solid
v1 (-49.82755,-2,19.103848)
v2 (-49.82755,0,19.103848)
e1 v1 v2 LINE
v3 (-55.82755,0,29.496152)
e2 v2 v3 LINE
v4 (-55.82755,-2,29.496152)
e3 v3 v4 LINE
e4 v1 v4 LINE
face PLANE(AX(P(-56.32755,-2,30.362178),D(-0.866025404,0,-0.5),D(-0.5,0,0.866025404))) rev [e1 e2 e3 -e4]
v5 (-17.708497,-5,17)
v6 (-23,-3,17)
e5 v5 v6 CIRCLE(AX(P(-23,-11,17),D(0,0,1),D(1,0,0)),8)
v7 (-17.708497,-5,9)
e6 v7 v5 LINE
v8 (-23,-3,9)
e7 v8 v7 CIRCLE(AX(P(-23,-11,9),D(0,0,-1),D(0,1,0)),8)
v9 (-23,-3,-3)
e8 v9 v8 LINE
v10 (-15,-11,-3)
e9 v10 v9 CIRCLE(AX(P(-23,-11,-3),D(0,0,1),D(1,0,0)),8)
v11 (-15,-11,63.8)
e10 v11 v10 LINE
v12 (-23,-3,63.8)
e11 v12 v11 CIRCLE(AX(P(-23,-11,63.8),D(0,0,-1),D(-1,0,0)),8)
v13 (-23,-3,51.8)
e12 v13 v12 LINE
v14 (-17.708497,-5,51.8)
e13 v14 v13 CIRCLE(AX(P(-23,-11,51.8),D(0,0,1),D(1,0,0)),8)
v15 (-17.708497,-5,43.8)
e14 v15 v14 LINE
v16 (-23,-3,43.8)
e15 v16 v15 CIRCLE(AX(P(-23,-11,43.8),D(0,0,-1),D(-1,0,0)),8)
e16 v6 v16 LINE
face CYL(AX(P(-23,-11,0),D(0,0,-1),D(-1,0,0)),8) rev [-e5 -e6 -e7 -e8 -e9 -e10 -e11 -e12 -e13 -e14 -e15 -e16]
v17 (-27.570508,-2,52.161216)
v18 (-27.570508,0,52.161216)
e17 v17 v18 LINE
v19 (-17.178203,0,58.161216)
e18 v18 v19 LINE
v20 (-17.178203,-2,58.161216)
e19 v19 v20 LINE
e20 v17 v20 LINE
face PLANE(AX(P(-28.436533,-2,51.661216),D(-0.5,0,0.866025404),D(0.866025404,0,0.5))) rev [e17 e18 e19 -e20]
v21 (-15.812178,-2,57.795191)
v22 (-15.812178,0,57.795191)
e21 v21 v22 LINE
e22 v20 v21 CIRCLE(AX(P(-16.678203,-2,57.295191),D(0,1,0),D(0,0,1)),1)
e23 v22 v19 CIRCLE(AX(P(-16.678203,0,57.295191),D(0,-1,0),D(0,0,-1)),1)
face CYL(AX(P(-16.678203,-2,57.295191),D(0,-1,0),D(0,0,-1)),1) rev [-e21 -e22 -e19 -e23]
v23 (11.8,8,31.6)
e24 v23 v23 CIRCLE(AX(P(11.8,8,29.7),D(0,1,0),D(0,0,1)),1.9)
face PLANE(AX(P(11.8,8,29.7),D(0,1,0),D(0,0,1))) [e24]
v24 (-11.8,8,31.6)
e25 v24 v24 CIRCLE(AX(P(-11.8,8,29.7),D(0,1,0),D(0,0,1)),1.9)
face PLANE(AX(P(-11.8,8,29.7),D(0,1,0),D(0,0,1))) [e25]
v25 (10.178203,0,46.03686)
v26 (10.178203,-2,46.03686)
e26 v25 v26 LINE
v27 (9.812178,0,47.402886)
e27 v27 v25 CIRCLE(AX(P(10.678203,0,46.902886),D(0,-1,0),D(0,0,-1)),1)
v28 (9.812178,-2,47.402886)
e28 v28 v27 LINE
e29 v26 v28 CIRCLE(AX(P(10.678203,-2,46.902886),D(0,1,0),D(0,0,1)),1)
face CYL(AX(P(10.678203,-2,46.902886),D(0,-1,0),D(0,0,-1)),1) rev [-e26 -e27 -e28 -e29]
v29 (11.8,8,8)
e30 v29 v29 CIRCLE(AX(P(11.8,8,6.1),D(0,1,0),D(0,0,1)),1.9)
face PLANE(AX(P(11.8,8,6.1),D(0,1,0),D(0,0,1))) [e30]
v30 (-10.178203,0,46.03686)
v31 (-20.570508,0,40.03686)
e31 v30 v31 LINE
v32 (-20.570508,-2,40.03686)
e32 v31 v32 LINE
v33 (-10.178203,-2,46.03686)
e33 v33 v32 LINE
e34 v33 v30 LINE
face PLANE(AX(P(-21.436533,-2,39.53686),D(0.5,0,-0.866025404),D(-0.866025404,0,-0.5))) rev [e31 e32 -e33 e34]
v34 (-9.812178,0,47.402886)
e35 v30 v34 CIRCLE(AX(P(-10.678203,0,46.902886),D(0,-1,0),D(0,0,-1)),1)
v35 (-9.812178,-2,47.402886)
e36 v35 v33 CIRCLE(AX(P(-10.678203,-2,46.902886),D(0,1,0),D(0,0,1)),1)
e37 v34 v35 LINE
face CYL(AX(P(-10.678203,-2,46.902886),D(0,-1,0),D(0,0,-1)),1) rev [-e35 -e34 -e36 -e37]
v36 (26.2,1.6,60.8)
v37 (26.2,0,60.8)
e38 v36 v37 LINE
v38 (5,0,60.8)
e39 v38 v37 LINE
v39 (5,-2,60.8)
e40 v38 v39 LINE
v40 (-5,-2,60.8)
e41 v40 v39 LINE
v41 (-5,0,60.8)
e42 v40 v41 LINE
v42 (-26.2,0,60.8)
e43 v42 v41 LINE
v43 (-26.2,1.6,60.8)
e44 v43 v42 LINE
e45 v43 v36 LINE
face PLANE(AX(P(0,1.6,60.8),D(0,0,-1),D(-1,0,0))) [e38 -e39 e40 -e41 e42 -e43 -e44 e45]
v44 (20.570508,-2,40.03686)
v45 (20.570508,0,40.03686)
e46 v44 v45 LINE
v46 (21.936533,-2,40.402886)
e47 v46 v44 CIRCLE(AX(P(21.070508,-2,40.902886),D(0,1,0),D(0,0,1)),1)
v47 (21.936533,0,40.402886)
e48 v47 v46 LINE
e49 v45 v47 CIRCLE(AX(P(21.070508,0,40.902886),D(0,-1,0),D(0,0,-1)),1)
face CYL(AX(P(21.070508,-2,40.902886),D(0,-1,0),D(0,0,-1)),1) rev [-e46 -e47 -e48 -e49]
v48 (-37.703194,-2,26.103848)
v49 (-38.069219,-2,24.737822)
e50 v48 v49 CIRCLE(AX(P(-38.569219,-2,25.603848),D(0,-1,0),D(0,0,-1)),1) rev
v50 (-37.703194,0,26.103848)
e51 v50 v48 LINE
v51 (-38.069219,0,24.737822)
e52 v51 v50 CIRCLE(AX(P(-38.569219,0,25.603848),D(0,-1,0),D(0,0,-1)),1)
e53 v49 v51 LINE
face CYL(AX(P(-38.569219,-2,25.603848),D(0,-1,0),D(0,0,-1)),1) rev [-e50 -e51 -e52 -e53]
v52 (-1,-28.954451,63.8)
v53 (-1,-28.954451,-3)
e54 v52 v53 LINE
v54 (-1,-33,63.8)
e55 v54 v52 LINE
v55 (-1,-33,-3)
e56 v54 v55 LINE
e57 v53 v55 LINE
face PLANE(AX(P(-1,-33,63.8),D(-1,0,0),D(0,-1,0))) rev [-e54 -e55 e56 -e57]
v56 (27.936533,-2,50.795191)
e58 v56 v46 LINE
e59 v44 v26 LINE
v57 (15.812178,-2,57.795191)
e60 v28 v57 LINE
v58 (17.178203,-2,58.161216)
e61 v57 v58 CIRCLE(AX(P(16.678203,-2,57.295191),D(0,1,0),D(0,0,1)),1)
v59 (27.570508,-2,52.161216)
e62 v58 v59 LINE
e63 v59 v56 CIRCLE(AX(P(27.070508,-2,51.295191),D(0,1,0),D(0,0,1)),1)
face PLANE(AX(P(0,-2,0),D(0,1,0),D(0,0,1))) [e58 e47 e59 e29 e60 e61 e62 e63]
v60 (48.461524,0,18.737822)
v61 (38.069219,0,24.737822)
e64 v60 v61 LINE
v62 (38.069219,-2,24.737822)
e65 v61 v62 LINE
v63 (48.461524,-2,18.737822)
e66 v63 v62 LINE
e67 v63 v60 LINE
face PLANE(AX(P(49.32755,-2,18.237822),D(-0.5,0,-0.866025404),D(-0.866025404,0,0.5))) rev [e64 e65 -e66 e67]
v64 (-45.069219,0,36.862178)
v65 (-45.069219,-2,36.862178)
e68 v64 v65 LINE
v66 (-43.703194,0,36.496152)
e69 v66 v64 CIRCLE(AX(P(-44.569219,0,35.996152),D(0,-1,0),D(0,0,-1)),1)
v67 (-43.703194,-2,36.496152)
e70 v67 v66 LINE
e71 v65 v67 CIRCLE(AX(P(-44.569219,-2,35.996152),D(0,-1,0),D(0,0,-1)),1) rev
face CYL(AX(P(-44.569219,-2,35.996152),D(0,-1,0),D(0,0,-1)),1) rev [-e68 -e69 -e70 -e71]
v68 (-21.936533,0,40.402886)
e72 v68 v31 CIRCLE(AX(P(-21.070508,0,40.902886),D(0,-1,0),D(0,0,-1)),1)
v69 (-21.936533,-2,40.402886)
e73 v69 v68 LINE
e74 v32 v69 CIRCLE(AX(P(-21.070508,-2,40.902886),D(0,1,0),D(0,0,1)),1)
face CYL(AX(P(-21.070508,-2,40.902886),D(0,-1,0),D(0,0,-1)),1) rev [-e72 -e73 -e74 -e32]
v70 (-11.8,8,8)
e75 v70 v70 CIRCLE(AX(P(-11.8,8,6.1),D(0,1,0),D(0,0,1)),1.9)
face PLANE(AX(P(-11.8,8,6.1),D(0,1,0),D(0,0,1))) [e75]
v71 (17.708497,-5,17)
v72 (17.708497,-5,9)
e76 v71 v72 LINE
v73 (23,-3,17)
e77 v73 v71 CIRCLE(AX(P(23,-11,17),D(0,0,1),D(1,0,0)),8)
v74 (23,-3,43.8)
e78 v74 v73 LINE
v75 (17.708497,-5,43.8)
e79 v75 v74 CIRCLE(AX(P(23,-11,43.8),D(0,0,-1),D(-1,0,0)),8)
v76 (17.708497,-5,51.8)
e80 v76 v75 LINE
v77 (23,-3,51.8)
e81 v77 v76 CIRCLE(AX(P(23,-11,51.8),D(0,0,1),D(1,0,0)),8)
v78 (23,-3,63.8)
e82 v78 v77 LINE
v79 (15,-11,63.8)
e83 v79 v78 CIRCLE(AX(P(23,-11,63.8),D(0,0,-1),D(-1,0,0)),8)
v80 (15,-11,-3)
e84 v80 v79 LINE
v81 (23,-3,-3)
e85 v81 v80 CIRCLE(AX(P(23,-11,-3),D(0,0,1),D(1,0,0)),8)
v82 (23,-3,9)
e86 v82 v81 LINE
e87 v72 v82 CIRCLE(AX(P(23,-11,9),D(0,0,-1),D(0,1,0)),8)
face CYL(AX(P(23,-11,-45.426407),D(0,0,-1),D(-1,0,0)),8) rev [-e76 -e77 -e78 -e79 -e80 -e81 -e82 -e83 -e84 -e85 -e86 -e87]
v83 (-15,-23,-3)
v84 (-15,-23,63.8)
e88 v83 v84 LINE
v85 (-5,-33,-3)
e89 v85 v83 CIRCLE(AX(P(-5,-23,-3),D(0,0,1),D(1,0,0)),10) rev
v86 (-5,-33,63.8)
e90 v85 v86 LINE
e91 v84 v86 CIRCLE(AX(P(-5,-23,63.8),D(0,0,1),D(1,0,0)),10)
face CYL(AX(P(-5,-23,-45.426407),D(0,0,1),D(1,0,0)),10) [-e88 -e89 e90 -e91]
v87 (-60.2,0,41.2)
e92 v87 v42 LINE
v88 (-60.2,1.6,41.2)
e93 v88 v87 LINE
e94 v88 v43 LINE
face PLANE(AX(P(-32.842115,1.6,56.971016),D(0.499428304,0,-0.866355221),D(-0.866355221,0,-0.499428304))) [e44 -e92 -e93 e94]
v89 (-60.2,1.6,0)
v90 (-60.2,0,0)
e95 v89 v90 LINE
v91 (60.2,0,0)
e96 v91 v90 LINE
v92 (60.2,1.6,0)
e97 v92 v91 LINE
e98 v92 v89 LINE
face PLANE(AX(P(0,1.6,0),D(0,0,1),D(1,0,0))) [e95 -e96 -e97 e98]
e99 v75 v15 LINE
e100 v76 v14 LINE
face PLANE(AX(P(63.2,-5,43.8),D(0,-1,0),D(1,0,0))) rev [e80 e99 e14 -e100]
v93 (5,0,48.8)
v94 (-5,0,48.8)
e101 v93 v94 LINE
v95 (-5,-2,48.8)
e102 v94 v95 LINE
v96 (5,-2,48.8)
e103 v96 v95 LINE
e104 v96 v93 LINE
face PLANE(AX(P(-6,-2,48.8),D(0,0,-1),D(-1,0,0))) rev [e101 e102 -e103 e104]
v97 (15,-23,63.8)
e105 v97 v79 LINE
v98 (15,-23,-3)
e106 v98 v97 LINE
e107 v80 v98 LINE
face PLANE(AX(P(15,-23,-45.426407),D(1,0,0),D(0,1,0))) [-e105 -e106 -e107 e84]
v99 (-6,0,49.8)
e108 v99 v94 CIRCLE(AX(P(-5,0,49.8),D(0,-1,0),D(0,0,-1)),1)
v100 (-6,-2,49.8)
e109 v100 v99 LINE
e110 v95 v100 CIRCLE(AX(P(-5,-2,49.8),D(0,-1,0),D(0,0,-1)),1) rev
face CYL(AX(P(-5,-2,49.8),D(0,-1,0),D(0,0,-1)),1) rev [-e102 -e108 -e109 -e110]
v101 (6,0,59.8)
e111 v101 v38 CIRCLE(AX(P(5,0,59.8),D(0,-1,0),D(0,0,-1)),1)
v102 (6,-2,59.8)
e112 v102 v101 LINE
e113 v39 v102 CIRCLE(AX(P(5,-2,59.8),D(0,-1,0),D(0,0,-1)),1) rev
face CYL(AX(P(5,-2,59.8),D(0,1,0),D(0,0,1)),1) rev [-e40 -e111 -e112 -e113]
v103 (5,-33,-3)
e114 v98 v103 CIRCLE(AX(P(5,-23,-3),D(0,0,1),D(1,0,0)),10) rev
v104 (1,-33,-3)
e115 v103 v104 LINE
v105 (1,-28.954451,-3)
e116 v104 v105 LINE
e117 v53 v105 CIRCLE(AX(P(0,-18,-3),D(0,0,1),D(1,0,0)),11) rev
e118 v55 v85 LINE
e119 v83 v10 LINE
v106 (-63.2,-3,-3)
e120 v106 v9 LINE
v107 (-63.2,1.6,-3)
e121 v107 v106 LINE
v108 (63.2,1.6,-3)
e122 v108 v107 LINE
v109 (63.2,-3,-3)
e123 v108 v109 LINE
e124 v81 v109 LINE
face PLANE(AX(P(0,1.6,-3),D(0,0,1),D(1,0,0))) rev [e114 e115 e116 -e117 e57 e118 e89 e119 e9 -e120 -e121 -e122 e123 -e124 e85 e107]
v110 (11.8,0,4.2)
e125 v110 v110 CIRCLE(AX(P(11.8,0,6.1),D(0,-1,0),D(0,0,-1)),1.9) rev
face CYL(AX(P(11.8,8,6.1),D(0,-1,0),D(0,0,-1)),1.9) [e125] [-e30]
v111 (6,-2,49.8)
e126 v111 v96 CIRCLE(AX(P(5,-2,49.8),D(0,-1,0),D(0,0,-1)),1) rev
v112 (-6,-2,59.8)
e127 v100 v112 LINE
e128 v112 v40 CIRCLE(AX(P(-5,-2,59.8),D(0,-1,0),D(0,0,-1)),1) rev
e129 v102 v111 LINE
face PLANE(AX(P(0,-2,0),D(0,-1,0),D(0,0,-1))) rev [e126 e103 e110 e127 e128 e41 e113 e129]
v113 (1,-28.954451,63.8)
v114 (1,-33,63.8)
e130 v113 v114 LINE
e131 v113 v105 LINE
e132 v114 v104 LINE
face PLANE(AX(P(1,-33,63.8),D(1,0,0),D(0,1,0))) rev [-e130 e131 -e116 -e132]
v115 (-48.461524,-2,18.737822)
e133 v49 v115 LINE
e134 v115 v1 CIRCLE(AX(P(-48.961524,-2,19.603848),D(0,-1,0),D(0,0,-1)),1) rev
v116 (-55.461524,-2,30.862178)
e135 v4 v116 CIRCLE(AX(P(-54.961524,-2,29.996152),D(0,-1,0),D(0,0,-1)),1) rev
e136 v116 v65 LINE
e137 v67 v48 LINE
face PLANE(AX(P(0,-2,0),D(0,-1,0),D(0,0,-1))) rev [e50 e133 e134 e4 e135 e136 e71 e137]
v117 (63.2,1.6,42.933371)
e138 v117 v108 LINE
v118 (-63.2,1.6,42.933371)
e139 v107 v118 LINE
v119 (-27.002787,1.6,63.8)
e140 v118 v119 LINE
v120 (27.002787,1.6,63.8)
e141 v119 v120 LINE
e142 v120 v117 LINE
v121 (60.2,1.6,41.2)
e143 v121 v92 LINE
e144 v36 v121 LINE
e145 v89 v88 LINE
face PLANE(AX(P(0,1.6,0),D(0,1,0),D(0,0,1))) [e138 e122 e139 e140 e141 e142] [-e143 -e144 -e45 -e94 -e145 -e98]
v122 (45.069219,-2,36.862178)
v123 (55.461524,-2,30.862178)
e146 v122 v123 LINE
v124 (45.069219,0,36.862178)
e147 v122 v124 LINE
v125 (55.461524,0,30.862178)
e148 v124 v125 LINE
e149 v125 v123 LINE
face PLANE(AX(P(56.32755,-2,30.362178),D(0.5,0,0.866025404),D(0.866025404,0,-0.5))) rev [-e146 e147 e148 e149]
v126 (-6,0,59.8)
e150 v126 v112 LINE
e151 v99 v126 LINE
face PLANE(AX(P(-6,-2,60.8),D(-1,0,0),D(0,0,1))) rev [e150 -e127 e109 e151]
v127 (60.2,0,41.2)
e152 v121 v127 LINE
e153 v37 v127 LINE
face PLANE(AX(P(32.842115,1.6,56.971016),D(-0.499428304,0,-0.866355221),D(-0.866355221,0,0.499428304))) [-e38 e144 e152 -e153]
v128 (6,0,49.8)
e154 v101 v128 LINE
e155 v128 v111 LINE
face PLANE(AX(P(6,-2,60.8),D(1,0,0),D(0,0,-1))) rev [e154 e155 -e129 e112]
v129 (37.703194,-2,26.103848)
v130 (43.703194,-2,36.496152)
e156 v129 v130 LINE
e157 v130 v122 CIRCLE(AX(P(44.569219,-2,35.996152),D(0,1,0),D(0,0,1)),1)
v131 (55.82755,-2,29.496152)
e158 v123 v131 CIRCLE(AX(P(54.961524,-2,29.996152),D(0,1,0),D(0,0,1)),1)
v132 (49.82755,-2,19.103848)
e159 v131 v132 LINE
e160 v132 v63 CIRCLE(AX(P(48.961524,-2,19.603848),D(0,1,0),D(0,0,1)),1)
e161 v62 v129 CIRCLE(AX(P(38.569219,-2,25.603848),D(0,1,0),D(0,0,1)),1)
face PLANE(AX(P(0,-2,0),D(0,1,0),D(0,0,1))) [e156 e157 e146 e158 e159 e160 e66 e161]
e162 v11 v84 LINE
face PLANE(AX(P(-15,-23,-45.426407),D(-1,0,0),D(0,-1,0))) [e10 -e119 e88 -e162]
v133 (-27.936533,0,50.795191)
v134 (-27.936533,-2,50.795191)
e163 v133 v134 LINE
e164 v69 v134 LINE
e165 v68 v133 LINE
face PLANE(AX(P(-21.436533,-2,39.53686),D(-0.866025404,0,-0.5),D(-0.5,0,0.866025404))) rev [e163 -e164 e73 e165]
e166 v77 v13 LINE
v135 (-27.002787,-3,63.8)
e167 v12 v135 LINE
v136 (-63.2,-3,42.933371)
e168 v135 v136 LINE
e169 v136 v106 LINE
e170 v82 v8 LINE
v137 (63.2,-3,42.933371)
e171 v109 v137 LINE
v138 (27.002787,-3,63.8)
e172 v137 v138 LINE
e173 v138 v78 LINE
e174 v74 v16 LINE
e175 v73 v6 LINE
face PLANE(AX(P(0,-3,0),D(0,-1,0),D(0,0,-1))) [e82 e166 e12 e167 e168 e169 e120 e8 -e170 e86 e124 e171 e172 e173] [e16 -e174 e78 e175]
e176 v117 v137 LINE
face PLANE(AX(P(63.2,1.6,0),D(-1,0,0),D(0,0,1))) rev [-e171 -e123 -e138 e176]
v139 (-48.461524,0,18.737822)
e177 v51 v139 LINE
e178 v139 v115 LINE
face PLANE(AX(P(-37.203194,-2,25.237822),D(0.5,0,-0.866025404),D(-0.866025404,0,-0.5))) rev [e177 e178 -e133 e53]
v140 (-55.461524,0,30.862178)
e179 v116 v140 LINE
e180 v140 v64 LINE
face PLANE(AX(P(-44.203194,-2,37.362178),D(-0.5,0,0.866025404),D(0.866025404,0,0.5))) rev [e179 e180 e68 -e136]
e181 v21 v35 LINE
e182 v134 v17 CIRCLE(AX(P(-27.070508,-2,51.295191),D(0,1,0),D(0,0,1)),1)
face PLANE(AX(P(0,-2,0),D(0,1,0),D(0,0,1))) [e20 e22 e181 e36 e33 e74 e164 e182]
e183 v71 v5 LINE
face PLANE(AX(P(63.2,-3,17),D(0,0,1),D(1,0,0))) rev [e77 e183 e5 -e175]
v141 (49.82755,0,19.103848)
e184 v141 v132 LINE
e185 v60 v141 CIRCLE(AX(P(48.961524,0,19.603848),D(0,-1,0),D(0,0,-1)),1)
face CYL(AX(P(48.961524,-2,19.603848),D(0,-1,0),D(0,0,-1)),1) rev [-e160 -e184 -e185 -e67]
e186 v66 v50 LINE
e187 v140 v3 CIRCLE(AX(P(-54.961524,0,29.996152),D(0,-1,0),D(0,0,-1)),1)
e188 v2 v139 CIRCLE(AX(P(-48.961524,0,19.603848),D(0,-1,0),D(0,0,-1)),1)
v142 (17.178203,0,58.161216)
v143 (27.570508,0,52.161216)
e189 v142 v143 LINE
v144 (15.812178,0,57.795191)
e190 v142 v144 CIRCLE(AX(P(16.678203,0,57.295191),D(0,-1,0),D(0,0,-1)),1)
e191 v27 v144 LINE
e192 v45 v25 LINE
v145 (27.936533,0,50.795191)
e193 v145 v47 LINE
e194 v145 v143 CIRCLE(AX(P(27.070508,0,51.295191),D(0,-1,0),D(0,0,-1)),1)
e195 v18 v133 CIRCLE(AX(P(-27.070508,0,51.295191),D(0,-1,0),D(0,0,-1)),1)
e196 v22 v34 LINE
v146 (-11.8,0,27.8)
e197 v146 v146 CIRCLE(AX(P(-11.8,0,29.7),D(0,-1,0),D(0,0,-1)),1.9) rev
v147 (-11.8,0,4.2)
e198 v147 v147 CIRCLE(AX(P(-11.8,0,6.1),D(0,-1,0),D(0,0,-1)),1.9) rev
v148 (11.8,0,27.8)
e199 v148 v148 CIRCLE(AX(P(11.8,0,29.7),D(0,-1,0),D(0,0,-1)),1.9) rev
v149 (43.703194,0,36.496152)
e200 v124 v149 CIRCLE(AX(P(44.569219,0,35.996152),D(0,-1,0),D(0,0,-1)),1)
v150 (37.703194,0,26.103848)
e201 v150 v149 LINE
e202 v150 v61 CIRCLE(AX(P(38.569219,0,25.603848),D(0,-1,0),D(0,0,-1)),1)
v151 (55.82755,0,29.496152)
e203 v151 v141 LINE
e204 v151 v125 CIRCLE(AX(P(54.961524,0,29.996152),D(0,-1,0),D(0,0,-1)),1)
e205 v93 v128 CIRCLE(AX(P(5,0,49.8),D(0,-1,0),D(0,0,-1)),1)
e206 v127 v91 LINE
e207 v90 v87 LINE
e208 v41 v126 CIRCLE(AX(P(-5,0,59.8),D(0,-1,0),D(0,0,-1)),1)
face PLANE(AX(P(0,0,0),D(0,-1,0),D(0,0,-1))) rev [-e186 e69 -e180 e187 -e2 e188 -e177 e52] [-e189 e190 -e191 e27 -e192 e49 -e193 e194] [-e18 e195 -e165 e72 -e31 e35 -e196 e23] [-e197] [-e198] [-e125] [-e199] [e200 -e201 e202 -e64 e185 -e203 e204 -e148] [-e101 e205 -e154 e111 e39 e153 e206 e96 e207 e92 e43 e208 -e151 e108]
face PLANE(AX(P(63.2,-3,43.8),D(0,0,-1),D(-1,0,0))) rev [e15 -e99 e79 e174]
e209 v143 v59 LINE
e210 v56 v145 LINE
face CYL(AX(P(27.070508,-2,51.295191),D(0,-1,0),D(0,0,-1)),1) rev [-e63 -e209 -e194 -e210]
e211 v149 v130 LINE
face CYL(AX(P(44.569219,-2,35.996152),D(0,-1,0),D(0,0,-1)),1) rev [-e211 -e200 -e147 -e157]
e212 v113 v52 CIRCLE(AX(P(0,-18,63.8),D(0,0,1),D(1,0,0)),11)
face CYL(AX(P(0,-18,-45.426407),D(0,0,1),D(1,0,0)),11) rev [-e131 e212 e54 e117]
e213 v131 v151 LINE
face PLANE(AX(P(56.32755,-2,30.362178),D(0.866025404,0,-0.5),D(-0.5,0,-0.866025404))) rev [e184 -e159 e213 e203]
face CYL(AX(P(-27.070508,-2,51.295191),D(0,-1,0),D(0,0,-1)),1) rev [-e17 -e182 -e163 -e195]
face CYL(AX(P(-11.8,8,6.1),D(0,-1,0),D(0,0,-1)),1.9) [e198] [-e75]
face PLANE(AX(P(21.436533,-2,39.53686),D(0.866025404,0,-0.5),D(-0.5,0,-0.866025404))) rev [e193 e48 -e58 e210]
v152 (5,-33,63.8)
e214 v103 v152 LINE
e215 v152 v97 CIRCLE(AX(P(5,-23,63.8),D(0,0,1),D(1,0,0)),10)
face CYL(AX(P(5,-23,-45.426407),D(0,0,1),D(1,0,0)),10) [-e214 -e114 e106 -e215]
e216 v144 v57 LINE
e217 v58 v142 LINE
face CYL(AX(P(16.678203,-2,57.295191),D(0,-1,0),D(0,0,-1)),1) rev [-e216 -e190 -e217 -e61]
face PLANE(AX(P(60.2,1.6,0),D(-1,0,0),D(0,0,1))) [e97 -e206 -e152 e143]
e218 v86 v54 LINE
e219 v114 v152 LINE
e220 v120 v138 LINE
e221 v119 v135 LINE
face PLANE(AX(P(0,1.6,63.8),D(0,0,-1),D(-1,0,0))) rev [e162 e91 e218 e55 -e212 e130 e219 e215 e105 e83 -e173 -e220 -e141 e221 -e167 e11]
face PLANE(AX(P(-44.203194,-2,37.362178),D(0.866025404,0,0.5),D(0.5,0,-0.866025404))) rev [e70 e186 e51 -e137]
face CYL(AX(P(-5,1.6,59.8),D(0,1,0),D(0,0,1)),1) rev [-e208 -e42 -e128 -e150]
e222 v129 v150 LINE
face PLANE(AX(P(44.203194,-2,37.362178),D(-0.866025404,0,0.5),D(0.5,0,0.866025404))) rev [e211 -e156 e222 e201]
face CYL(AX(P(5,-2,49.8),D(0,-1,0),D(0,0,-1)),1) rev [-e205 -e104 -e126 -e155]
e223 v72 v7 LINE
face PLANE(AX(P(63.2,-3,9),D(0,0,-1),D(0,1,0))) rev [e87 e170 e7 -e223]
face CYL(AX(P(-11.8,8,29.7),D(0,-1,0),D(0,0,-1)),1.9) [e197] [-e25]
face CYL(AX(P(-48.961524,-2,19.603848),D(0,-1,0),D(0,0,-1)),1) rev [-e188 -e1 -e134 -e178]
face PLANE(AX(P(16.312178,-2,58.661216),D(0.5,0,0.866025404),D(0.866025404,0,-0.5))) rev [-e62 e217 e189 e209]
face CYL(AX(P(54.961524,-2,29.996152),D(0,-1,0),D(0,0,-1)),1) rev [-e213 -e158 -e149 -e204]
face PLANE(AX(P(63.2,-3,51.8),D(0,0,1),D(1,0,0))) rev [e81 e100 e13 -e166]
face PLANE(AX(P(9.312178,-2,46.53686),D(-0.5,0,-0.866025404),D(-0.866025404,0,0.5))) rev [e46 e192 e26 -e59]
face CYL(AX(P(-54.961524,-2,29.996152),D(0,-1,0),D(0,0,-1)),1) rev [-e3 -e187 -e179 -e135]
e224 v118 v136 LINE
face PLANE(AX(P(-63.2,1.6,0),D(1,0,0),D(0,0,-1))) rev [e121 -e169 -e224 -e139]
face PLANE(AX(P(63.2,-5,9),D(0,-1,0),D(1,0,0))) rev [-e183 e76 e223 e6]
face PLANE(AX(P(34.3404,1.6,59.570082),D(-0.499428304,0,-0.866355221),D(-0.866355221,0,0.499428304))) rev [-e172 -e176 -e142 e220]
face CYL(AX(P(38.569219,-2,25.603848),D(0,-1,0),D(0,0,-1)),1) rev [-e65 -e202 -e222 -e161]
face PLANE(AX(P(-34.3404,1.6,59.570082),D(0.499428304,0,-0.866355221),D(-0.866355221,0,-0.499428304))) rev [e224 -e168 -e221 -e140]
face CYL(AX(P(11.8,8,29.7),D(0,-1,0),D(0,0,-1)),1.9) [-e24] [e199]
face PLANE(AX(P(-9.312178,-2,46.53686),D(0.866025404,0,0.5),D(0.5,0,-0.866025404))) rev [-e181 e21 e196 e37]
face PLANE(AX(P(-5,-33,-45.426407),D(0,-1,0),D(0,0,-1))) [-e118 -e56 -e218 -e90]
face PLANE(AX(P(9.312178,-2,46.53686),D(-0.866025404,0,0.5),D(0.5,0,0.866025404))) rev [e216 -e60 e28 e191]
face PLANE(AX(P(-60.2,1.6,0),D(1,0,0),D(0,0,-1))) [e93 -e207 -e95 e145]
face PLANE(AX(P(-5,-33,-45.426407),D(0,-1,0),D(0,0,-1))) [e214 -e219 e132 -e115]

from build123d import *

# Parameters (mm, degrees)
EXTRUDE_1_DEPTH          = 1.6
EXTRUDE_2_DEPTH          = 3
SKETCH_3_W               = 12
SKETCH_3_H               = 12
CUT_EXTRUDE_1_DEPTH      = 2
FILLET_1_R               = 1
SKETCH_4_R               = 1.9
EXTRUDE_3_DEPTH          = 8
SKETCH_12_R              = 11
EXTRUDE_9_DEPTH          = 66.8
CUT_EXTRUDE_2_DEPTH      = 98.70097236
CUT_EXTRUDE_2_DEPTH_BACK = 98.70097236
SKETCH_13_W              = 2
SKETCH_13_H              = 4.04554885
CUT_EXTRUDE_5_DEPTH      = 107.182296076
CUT_EXTRUDE_5_DEPTH_BACK = 107.182296076
SKETCH_16_W              = 8
SKETCH_16_H              = 2
FILLET_2_R               = 8


with BuildPart() as part:
    # Эскиз1 → Бобышка-Вытянуть1 (new body)
    with BuildSketch(Plane(origin=(0, 0, 0), x_dir=(1, 0, 0), z_dir=(0, 1, 0))):
        Polygon((27.002786573, -63.8), (63.2, -42.933371083), (63.2, 3), (-63.2, 3), (-63.2, -42.933371083), (-27.002786573, -63.8), align=None)
        Polygon((60.2, -41.2), (60.2, 0), (-60.2, 0), (-60.2, -41.2), (-26.2, -60.8), (26.2, -60.8), align=None, mode=Mode.SUBTRACT)
    extrude(amount=EXTRUDE_1_DEPTH)

    # Эскиз2 → Бобышка-Вытянуть2 (add)
    with BuildSketch(Plane.XZ):
        Polygon((63.2, 42.933371083), (27.002786573, 63.8), (-27.002786573, 63.8), (-63.2, 42.933371083), (-63.2, -3), (63.2, -3), align=None)
    extrude(amount=EXTRUDE_2_DEPTH)

    # Эскиз3 → Вырез-Вытянуть1 (cut)
    with BuildSketch(Plane(origin=(0, 0, 0), x_dir=(1, 0, 0), z_dir=(0, 1, 0))):
        with Locations((0, -54.8)):
            Rectangle(SKETCH_3_W, SKETCH_3_H)
        Polygon((-21.436533479, -39.536860279), (-9.312177826, -46.536860279), (-16.312177826, -58.661215932), (-28.436533479, -51.661215932), align=None)
        Polygon((9.312177826, -46.536860279), (21.436533479, -39.536860279), (28.436533479, -51.661215932), (16.312177826, -58.661215932), align=None)
        Polygon((56.327549631, -30.362177826), (44.203193978, -37.362177826), (37.203193978, -25.237822174), (49.327549631, -18.237822174), align=None)
        Polygon((-44.203193978, -37.362177826), (-37.203193978, -25.237822174), (-49.327549631, -18.237822174), (-56.327549631, -30.362177826), align=None)
    extrude(amount=-CUT_EXTRUDE_1_DEPTH, mode=Mode.SUBTRACT)

    # Скругление1
    fillet_1_edges = [part.edges().sort_by_distance(p)[0] for p in [
        (-44.203193978, -1, 37.362177826),
        (-56.327549631, -1, 30.362177826),
        (-49.327549631, -1, 18.237822174),
        (-37.203193978, -1, 25.237822174),
        (49.327549631, -1, 18.237822174),
        (56.327549631, -1, 30.362177826),
        (44.203193978, -1, 37.362177826),
        (37.203193978, -1, 25.237822174),
        (-28.436533479, -1, 51.661215932),
        (-21.436533479, -1, 39.536860279),
        (-9.312177826, -1, 46.536860279),
        (-16.312177826, -1, 58.661215932),
        (16.312177826, -1, 58.661215932),
        (9.312177826, -1, 46.536860279),
        (21.436533479, -1, 39.536860279),
        (28.436533479, -1, 51.661215932),
        (-6, -1, 60.8),
        (-6, -1, 48.8),
        (6, -1, 48.8),
        (6, -1, 60.8),
    ]]
    fillet(fillet_1_edges, radius=FILLET_1_R)

    # Эскиз4 → Бобышка-Вытянуть3 (add)
    with BuildSketch(Plane(origin=(0, 0, 0), x_dir=(1, 0, 0), z_dir=(0, 1, 0))):
        with Locations(Location((-11.8, -6.1, 0), (0, 0, 90))):
            Circle(SKETCH_4_R)
        with Locations(Location((-11.8, -29.7, 0), (0, 0, 90))):
            Circle(SKETCH_4_R)
        with Locations(Location((11.8, -29.7, 0), (0, 0, 90))):
            Circle(SKETCH_4_R)
        with Locations(Location((11.8, -6.1, 0), (0, 0, 90))):
            Circle(SKETCH_4_R)
    extrude(amount=EXTRUDE_3_DEPTH)

    # Эскиз12 → Бобышка-Вытянуть9 (add)
    with BuildSketch(Plane.XY.offset(63.8)):
        with BuildLine():
            Line((-5, -33), (5, -33))
            ThreePointArc((5, -33), (12.071067812, -30.071067812), (15, -23))
            Line((15, -23), (15, -3))
            Line((15, -3), (-15, -3))
            Line((-15, -3), (-15, -23))
            ThreePointArc((-15, -23), (-12.071067812, -30.071067812), (-5, -33))
        make_face()
        with Locations((0, -18)):
            Circle(SKETCH_12_R, mode=Mode.SUBTRACT)
    extrude(amount=-EXTRUDE_9_DEPTH)

    # Эскиз13 → Вырез-Вытянуть2 (cut, two sides: drawn at the far end of the back side and taken through both)
    with BuildSketch(Plane(origin=(0, 0, -3), x_dir=(-1, 0, 0), z_dir=(0, 0, -1)).offset(-CUT_EXTRUDE_2_DEPTH_BACK)):
        with Locations((0, -30.977225575)):
            Rectangle(SKETCH_13_W, SKETCH_13_H)
    extrude(amount=CUT_EXTRUDE_2_DEPTH + CUT_EXTRUDE_2_DEPTH_BACK, mode=Mode.SUBTRACT)

    # Эскиз16 → Вырез-Вытянуть5 (cut, two sides: drawn at the far end of the back side and taken through both)
    with BuildSketch(Plane.ZY.offset(15).offset(-CUT_EXTRUDE_5_DEPTH_BACK)):
        with Locations((13, -4)):
            Rectangle(SKETCH_16_W, SKETCH_16_H)
        with Locations((47.8, -4)):
            Rectangle(SKETCH_16_W, SKETCH_16_H)
    extrude(amount=CUT_EXTRUDE_5_DEPTH + CUT_EXTRUDE_5_DEPTH_BACK, mode=Mode.SUBTRACT)

    # Скругление2
    # the kernel refuses this fillet: 8 mm, written as the material it adds along each edge
    with BuildSketch(Plane(origin=(15, -3, 29), x_dir=(0, -1, 0), z_dir=(0, 0, -1))) as fillet_2_piece_1_section:
        with BuildLine():
            CenterArc((FILLET_2_R, -FILLET_2_R), FILLET_2_R, 90, 90)
            Line((0, -FILLET_2_R), (0, 0))
            Line((0, 0), (FILLET_2_R, 0))
        make_face()
    fillet_2_piece_1 = extrude(amount=32, mode=Mode.PRIVATE)
    fillet_2_piece_1 = split(fillet_2_piece_1, bisect_by=Plane(origin=(15.781963001, -5, 23), z_dir=(0, -1, 0)), keep=Keep.TOP, mode=Mode.PRIVATE)
    add(fillet_2_piece_1)
    with BuildSketch(Plane(origin=(15, -3, 29), x_dir=(0, -1, 0), z_dir=(0, 0, -1))) as fillet_2_piece_2_section:
        with BuildLine():
            CenterArc((FILLET_2_R, -FILLET_2_R), FILLET_2_R, 90, 90)
            Line((0, -FILLET_2_R), (0, 0))
            Line((0, 0), (FILLET_2_R, 0))
        make_face()
    fillet_2_piece_2 = extrude(amount=52, mode=Mode.PRIVATE)
    fillet_2_piece_2 = split(fillet_2_piece_2, bisect_by=Plane(origin=(17.359978734, -3.841824997, 17), z_dir=(0, 0, 1)), keep=Keep.TOP, mode=Mode.PRIVATE)
    add(fillet_2_piece_2)
    with BuildSketch(Plane(origin=(15, -3, 9), x_dir=(0, -1, 0), z_dir=(0, 0, -1)), Plane(origin=(15, -3, 63.8), x_dir=(0, -1, 0), z_dir=(0, 0, -1))) as fillet_2_piece_3:
        with BuildLine():
            CenterArc((FILLET_2_R, -FILLET_2_R), FILLET_2_R, 90, 90)
            Line((0, -FILLET_2_R), (0, 0))
            Line((0, 0), (FILLET_2_R, 0))
        make_face()
    extrude(amount=12)
    with BuildSketch(Plane(origin=(-15, -3, 29), x_dir=(0, -1, 0), z_dir=(0, 0, -1))) as fillet_2_piece_4_section:
        with BuildLine():
            CenterArc((FILLET_2_R, FILLET_2_R), FILLET_2_R, 180, 90)
            Line((0, FILLET_2_R), (0, 0))
            Line((0, 0), (FILLET_2_R, 0))
        make_face()
    fillet_2_piece_4 = extrude(amount=32, mode=Mode.PRIVATE)
    fillet_2_piece_4 = split(fillet_2_piece_4, bisect_by=Plane(origin=(-15.781963001, -5, 23), z_dir=(0, -1, 0)), keep=Keep.TOP, mode=Mode.PRIVATE)
    add(fillet_2_piece_4)
    with BuildSketch(Plane(origin=(-15, -3, 29), x_dir=(0, -1, 0), z_dir=(0, 0, -1))) as fillet_2_piece_5_section:
        with BuildLine():
            CenterArc((FILLET_2_R, FILLET_2_R), FILLET_2_R, 180, 90)
            Line((0, FILLET_2_R), (0, 0))
            Line((0, 0), (FILLET_2_R, 0))
        make_face()
    fillet_2_piece_5 = extrude(amount=52, mode=Mode.PRIVATE)
    fillet_2_piece_5 = split(fillet_2_piece_5, bisect_by=Plane(origin=(-17.359978734, -3.841824997, 17), z_dir=(0, 0, 1)), keep=Keep.TOP, mode=Mode.PRIVATE)
    add(fillet_2_piece_5)
    with BuildSketch(Plane(origin=(-15, -3, 9), x_dir=(0, -1, 0), z_dir=(0, 0, -1)), Plane(origin=(-15, -3, 63.8), x_dir=(0, -1, 0), z_dir=(0, 0, -1))) as fillet_2_piece_6:
        with BuildLine():
            CenterArc((FILLET_2_R, FILLET_2_R), FILLET_2_R, 180, 90)
            Line((0, FILLET_2_R), (0, 0))
            Line((0, 0), (FILLET_2_R, 0))
        make_face()
    extrude(amount=12)
    with BuildSketch(Plane(origin=(15, -3, 63.8), x_dir=(0, -1, 0), z_dir=(0, 0, -1))) as fillet_2_piece_7_section:
        with BuildLine():
            CenterArc((FILLET_2_R, -FILLET_2_R), FILLET_2_R, 90, 90)
            Line((0, -FILLET_2_R), (0, 0))
            Line((0, 0), (FILLET_2_R, 0))
        make_face()
    fillet_2_piece_7 = extrude(amount=66.8, mode=Mode.PRIVATE)
    fillet_2_piece_7 = split(fillet_2_piece_7, bisect_by=Plane(origin=(15.781963001, -5, 57.8), z_dir=(0, -1, 0)), keep=Keep.TOP, mode=Mode.PRIVATE)
    add(fillet_2_piece_7)
    with BuildSketch(Plane(origin=(15, -3, 63.8), x_dir=(0, -1, 0), z_dir=(0, 0, -1))) as fillet_2_piece_8_section:
        with BuildLine():
            CenterArc((FILLET_2_R, -FILLET_2_R), FILLET_2_R, 90, 90)
            Line((0, -FILLET_2_R), (0, 0))
            Line((0, 0), (FILLET_2_R, 0))
        make_face()
    fillet_2_piece_8 = extrude(amount=66.8, mode=Mode.PRIVATE)
    fillet_2_piece_8 = split(fillet_2_piece_8, bisect_by=Plane(origin=(17.359978734, -3.841824997, 51.8), z_dir=(0, 0, 1)), keep=Keep.TOP, mode=Mode.PRIVATE)
    add(fillet_2_piece_8)
    with BuildSketch(Plane(origin=(15, -3, 43.8), x_dir=(0, -1, 0), z_dir=(0, 0, -1))) as fillet_2_piece_9:
        with BuildLine():
            CenterArc((FILLET_2_R, -FILLET_2_R), FILLET_2_R, 90, 90)
            Line((0, -FILLET_2_R), (0, 0))
            Line((0, 0), (FILLET_2_R, 0))
        make_face()
    extrude(amount=26.8)
    with BuildSketch(Plane(origin=(15, -3, 63.8), x_dir=(0, -1, 0), z_dir=(0, 0, -1))) as fillet_2_piece_10_section:
        with BuildLine():
            CenterArc((FILLET_2_R, -FILLET_2_R), FILLET_2_R, 90, 90)
            Line((0, -FILLET_2_R), (0, 0))
            Line((0, 0), (FILLET_2_R, 0))
        make_face()
    fillet_2_piece_10 = extrude(amount=66.8, mode=Mode.PRIVATE)
    fillet_2_piece_10 = split(fillet_2_piece_10, bisect_by=Plane(origin=(17.359978734, -3.841824997, 9), z_dir=(0, 0, -1)), keep=Keep.TOP, mode=Mode.PRIVATE)
    add(fillet_2_piece_10)
    with BuildSketch(Plane(origin=(15, -3, 63.8), x_dir=(0, -1, 0), z_dir=(0, 0, -1))) as fillet_2_piece_11_section:
        with BuildLine():
            CenterArc((FILLET_2_R, -FILLET_2_R), FILLET_2_R, 90, 90)
            Line((0, -FILLET_2_R), (0, 0))
            Line((0, 0), (FILLET_2_R, 0))
        make_face()
    fillet_2_piece_11 = extrude(amount=32, mode=Mode.PRIVATE)
    fillet_2_piece_11 = split(fillet_2_piece_11, bisect_by=Plane(origin=(15.781963001, -5, 57.8), z_dir=(0, -1, 0)), keep=Keep.TOP, mode=Mode.PRIVATE)
    add(fillet_2_piece_11)
    with BuildSketch(Plane(origin=(15, -3, 83.8), x_dir=(0, -1, 0), z_dir=(0, 0, -1))) as fillet_2_piece_12_section:
        with BuildLine():
            CenterArc((FILLET_2_R, -FILLET_2_R), FILLET_2_R, 90, 90)
            Line((0, -FILLET_2_R), (0, 0))
            Line((0, 0), (FILLET_2_R, 0))
        make_face()
    fillet_2_piece_12 = extrude(amount=52, mode=Mode.PRIVATE)
    fillet_2_piece_12 = split(fillet_2_piece_12, bisect_by=Plane(origin=(17.359978734, -3.841824997, 43.8), z_dir=(0, 0, -1)), keep=Keep.TOP, mode=Mode.PRIVATE)
    add(fillet_2_piece_12)
    with BuildSketch(Plane(origin=(-15, -3, 63.8), x_dir=(0, -1, 0), z_dir=(0, 0, -1))) as fillet_2_piece_13_section:
        with BuildLine():
            CenterArc((FILLET_2_R, FILLET_2_R), FILLET_2_R, 180, 90)
            Line((0, FILLET_2_R), (0, 0))
            Line((0, 0), (FILLET_2_R, 0))
        make_face()
    fillet_2_piece_13 = extrude(amount=66.8, mode=Mode.PRIVATE)
    fillet_2_piece_13 = split(fillet_2_piece_13, bisect_by=Plane(origin=(-15.781963001, -5, 57.8), z_dir=(0, -1, 0)), keep=Keep.TOP, mode=Mode.PRIVATE)
    add(fillet_2_piece_13)
    with BuildSketch(Plane(origin=(-15, -3, 63.8), x_dir=(0, -1, 0), z_dir=(0, 0, -1))) as fillet_2_piece_14_section:
        with BuildLine():
            CenterArc((FILLET_2_R, FILLET_2_R), FILLET_2_R, 180, 90)
            Line((0, FILLET_2_R), (0, 0))
            Line((0, 0), (FILLET_2_R, 0))
        make_face()
    fillet_2_piece_14 = extrude(amount=66.8, mode=Mode.PRIVATE)
    fillet_2_piece_14 = split(fillet_2_piece_14, bisect_by=Plane(origin=(-17.359978734, -3.841824997, 51.8), z_dir=(0, 0, 1)), keep=Keep.TOP, mode=Mode.PRIVATE)
    add(fillet_2_piece_14)
    with BuildSketch(Plane(origin=(-15, -3, 43.8), x_dir=(0, -1, 0), z_dir=(0, 0, -1))) as fillet_2_piece_15:
        with BuildLine():
            CenterArc((FILLET_2_R, FILLET_2_R), FILLET_2_R, 180, 90)
            Line((0, FILLET_2_R), (0, 0))
            Line((0, 0), (FILLET_2_R, 0))
        make_face()
    extrude(amount=26.8)
    with BuildSketch(Plane(origin=(-15, -3, 63.8), x_dir=(0, -1, 0), z_dir=(0, 0, -1))) as fillet_2_piece_16_section:
        with BuildLine():
            CenterArc((FILLET_2_R, FILLET_2_R), FILLET_2_R, 180, 90)
            Line((0, FILLET_2_R), (0, 0))
            Line((0, 0), (FILLET_2_R, 0))
        make_face()
    fillet_2_piece_16 = extrude(amount=66.8, mode=Mode.PRIVATE)
    fillet_2_piece_16 = split(fillet_2_piece_16, bisect_by=Plane(origin=(-17.359978734, -3.841824997, 9), z_dir=(0, 0, -1)), keep=Keep.TOP, mode=Mode.PRIVATE)
    add(fillet_2_piece_16)
    with BuildSketch(Plane(origin=(-15, -3, 63.8), x_dir=(0, -1, 0), z_dir=(0, 0, -1))) as fillet_2_piece_17_section:
        with BuildLine():
            CenterArc((FILLET_2_R, FILLET_2_R), FILLET_2_R, 180, 90)
            Line((0, FILLET_2_R), (0, 0))
            Line((0, 0), (FILLET_2_R, 0))
        make_face()
    fillet_2_piece_17 = extrude(amount=32, mode=Mode.PRIVATE)
    fillet_2_piece_17 = split(fillet_2_piece_17, bisect_by=Plane(origin=(-15.781963001, -5, 57.8), z_dir=(0, -1, 0)), keep=Keep.TOP, mode=Mode.PRIVATE)
    add(fillet_2_piece_17)
    with BuildSketch(Plane(origin=(-15, -3, 83.8), x_dir=(0, -1, 0), z_dir=(0, 0, -1))) as fillet_2_piece_18_section:
        with BuildLine():
            CenterArc((FILLET_2_R, FILLET_2_R), FILLET_2_R, 180, 90)
            Line((0, FILLET_2_R), (0, 0))
            Line((0, 0), (FILLET_2_R, 0))
        make_face()
    fillet_2_piece_18 = extrude(amount=52, mode=Mode.PRIVATE)
    fillet_2_piece_18 = split(fillet_2_piece_18, bisect_by=Plane(origin=(-17.359978734, -3.841824997, 43.8), z_dir=(0, 0, -1)), keep=Keep.TOP, mode=Mode.PRIVATE)
    add(fillet_2_piece_18)


solid = part.part
